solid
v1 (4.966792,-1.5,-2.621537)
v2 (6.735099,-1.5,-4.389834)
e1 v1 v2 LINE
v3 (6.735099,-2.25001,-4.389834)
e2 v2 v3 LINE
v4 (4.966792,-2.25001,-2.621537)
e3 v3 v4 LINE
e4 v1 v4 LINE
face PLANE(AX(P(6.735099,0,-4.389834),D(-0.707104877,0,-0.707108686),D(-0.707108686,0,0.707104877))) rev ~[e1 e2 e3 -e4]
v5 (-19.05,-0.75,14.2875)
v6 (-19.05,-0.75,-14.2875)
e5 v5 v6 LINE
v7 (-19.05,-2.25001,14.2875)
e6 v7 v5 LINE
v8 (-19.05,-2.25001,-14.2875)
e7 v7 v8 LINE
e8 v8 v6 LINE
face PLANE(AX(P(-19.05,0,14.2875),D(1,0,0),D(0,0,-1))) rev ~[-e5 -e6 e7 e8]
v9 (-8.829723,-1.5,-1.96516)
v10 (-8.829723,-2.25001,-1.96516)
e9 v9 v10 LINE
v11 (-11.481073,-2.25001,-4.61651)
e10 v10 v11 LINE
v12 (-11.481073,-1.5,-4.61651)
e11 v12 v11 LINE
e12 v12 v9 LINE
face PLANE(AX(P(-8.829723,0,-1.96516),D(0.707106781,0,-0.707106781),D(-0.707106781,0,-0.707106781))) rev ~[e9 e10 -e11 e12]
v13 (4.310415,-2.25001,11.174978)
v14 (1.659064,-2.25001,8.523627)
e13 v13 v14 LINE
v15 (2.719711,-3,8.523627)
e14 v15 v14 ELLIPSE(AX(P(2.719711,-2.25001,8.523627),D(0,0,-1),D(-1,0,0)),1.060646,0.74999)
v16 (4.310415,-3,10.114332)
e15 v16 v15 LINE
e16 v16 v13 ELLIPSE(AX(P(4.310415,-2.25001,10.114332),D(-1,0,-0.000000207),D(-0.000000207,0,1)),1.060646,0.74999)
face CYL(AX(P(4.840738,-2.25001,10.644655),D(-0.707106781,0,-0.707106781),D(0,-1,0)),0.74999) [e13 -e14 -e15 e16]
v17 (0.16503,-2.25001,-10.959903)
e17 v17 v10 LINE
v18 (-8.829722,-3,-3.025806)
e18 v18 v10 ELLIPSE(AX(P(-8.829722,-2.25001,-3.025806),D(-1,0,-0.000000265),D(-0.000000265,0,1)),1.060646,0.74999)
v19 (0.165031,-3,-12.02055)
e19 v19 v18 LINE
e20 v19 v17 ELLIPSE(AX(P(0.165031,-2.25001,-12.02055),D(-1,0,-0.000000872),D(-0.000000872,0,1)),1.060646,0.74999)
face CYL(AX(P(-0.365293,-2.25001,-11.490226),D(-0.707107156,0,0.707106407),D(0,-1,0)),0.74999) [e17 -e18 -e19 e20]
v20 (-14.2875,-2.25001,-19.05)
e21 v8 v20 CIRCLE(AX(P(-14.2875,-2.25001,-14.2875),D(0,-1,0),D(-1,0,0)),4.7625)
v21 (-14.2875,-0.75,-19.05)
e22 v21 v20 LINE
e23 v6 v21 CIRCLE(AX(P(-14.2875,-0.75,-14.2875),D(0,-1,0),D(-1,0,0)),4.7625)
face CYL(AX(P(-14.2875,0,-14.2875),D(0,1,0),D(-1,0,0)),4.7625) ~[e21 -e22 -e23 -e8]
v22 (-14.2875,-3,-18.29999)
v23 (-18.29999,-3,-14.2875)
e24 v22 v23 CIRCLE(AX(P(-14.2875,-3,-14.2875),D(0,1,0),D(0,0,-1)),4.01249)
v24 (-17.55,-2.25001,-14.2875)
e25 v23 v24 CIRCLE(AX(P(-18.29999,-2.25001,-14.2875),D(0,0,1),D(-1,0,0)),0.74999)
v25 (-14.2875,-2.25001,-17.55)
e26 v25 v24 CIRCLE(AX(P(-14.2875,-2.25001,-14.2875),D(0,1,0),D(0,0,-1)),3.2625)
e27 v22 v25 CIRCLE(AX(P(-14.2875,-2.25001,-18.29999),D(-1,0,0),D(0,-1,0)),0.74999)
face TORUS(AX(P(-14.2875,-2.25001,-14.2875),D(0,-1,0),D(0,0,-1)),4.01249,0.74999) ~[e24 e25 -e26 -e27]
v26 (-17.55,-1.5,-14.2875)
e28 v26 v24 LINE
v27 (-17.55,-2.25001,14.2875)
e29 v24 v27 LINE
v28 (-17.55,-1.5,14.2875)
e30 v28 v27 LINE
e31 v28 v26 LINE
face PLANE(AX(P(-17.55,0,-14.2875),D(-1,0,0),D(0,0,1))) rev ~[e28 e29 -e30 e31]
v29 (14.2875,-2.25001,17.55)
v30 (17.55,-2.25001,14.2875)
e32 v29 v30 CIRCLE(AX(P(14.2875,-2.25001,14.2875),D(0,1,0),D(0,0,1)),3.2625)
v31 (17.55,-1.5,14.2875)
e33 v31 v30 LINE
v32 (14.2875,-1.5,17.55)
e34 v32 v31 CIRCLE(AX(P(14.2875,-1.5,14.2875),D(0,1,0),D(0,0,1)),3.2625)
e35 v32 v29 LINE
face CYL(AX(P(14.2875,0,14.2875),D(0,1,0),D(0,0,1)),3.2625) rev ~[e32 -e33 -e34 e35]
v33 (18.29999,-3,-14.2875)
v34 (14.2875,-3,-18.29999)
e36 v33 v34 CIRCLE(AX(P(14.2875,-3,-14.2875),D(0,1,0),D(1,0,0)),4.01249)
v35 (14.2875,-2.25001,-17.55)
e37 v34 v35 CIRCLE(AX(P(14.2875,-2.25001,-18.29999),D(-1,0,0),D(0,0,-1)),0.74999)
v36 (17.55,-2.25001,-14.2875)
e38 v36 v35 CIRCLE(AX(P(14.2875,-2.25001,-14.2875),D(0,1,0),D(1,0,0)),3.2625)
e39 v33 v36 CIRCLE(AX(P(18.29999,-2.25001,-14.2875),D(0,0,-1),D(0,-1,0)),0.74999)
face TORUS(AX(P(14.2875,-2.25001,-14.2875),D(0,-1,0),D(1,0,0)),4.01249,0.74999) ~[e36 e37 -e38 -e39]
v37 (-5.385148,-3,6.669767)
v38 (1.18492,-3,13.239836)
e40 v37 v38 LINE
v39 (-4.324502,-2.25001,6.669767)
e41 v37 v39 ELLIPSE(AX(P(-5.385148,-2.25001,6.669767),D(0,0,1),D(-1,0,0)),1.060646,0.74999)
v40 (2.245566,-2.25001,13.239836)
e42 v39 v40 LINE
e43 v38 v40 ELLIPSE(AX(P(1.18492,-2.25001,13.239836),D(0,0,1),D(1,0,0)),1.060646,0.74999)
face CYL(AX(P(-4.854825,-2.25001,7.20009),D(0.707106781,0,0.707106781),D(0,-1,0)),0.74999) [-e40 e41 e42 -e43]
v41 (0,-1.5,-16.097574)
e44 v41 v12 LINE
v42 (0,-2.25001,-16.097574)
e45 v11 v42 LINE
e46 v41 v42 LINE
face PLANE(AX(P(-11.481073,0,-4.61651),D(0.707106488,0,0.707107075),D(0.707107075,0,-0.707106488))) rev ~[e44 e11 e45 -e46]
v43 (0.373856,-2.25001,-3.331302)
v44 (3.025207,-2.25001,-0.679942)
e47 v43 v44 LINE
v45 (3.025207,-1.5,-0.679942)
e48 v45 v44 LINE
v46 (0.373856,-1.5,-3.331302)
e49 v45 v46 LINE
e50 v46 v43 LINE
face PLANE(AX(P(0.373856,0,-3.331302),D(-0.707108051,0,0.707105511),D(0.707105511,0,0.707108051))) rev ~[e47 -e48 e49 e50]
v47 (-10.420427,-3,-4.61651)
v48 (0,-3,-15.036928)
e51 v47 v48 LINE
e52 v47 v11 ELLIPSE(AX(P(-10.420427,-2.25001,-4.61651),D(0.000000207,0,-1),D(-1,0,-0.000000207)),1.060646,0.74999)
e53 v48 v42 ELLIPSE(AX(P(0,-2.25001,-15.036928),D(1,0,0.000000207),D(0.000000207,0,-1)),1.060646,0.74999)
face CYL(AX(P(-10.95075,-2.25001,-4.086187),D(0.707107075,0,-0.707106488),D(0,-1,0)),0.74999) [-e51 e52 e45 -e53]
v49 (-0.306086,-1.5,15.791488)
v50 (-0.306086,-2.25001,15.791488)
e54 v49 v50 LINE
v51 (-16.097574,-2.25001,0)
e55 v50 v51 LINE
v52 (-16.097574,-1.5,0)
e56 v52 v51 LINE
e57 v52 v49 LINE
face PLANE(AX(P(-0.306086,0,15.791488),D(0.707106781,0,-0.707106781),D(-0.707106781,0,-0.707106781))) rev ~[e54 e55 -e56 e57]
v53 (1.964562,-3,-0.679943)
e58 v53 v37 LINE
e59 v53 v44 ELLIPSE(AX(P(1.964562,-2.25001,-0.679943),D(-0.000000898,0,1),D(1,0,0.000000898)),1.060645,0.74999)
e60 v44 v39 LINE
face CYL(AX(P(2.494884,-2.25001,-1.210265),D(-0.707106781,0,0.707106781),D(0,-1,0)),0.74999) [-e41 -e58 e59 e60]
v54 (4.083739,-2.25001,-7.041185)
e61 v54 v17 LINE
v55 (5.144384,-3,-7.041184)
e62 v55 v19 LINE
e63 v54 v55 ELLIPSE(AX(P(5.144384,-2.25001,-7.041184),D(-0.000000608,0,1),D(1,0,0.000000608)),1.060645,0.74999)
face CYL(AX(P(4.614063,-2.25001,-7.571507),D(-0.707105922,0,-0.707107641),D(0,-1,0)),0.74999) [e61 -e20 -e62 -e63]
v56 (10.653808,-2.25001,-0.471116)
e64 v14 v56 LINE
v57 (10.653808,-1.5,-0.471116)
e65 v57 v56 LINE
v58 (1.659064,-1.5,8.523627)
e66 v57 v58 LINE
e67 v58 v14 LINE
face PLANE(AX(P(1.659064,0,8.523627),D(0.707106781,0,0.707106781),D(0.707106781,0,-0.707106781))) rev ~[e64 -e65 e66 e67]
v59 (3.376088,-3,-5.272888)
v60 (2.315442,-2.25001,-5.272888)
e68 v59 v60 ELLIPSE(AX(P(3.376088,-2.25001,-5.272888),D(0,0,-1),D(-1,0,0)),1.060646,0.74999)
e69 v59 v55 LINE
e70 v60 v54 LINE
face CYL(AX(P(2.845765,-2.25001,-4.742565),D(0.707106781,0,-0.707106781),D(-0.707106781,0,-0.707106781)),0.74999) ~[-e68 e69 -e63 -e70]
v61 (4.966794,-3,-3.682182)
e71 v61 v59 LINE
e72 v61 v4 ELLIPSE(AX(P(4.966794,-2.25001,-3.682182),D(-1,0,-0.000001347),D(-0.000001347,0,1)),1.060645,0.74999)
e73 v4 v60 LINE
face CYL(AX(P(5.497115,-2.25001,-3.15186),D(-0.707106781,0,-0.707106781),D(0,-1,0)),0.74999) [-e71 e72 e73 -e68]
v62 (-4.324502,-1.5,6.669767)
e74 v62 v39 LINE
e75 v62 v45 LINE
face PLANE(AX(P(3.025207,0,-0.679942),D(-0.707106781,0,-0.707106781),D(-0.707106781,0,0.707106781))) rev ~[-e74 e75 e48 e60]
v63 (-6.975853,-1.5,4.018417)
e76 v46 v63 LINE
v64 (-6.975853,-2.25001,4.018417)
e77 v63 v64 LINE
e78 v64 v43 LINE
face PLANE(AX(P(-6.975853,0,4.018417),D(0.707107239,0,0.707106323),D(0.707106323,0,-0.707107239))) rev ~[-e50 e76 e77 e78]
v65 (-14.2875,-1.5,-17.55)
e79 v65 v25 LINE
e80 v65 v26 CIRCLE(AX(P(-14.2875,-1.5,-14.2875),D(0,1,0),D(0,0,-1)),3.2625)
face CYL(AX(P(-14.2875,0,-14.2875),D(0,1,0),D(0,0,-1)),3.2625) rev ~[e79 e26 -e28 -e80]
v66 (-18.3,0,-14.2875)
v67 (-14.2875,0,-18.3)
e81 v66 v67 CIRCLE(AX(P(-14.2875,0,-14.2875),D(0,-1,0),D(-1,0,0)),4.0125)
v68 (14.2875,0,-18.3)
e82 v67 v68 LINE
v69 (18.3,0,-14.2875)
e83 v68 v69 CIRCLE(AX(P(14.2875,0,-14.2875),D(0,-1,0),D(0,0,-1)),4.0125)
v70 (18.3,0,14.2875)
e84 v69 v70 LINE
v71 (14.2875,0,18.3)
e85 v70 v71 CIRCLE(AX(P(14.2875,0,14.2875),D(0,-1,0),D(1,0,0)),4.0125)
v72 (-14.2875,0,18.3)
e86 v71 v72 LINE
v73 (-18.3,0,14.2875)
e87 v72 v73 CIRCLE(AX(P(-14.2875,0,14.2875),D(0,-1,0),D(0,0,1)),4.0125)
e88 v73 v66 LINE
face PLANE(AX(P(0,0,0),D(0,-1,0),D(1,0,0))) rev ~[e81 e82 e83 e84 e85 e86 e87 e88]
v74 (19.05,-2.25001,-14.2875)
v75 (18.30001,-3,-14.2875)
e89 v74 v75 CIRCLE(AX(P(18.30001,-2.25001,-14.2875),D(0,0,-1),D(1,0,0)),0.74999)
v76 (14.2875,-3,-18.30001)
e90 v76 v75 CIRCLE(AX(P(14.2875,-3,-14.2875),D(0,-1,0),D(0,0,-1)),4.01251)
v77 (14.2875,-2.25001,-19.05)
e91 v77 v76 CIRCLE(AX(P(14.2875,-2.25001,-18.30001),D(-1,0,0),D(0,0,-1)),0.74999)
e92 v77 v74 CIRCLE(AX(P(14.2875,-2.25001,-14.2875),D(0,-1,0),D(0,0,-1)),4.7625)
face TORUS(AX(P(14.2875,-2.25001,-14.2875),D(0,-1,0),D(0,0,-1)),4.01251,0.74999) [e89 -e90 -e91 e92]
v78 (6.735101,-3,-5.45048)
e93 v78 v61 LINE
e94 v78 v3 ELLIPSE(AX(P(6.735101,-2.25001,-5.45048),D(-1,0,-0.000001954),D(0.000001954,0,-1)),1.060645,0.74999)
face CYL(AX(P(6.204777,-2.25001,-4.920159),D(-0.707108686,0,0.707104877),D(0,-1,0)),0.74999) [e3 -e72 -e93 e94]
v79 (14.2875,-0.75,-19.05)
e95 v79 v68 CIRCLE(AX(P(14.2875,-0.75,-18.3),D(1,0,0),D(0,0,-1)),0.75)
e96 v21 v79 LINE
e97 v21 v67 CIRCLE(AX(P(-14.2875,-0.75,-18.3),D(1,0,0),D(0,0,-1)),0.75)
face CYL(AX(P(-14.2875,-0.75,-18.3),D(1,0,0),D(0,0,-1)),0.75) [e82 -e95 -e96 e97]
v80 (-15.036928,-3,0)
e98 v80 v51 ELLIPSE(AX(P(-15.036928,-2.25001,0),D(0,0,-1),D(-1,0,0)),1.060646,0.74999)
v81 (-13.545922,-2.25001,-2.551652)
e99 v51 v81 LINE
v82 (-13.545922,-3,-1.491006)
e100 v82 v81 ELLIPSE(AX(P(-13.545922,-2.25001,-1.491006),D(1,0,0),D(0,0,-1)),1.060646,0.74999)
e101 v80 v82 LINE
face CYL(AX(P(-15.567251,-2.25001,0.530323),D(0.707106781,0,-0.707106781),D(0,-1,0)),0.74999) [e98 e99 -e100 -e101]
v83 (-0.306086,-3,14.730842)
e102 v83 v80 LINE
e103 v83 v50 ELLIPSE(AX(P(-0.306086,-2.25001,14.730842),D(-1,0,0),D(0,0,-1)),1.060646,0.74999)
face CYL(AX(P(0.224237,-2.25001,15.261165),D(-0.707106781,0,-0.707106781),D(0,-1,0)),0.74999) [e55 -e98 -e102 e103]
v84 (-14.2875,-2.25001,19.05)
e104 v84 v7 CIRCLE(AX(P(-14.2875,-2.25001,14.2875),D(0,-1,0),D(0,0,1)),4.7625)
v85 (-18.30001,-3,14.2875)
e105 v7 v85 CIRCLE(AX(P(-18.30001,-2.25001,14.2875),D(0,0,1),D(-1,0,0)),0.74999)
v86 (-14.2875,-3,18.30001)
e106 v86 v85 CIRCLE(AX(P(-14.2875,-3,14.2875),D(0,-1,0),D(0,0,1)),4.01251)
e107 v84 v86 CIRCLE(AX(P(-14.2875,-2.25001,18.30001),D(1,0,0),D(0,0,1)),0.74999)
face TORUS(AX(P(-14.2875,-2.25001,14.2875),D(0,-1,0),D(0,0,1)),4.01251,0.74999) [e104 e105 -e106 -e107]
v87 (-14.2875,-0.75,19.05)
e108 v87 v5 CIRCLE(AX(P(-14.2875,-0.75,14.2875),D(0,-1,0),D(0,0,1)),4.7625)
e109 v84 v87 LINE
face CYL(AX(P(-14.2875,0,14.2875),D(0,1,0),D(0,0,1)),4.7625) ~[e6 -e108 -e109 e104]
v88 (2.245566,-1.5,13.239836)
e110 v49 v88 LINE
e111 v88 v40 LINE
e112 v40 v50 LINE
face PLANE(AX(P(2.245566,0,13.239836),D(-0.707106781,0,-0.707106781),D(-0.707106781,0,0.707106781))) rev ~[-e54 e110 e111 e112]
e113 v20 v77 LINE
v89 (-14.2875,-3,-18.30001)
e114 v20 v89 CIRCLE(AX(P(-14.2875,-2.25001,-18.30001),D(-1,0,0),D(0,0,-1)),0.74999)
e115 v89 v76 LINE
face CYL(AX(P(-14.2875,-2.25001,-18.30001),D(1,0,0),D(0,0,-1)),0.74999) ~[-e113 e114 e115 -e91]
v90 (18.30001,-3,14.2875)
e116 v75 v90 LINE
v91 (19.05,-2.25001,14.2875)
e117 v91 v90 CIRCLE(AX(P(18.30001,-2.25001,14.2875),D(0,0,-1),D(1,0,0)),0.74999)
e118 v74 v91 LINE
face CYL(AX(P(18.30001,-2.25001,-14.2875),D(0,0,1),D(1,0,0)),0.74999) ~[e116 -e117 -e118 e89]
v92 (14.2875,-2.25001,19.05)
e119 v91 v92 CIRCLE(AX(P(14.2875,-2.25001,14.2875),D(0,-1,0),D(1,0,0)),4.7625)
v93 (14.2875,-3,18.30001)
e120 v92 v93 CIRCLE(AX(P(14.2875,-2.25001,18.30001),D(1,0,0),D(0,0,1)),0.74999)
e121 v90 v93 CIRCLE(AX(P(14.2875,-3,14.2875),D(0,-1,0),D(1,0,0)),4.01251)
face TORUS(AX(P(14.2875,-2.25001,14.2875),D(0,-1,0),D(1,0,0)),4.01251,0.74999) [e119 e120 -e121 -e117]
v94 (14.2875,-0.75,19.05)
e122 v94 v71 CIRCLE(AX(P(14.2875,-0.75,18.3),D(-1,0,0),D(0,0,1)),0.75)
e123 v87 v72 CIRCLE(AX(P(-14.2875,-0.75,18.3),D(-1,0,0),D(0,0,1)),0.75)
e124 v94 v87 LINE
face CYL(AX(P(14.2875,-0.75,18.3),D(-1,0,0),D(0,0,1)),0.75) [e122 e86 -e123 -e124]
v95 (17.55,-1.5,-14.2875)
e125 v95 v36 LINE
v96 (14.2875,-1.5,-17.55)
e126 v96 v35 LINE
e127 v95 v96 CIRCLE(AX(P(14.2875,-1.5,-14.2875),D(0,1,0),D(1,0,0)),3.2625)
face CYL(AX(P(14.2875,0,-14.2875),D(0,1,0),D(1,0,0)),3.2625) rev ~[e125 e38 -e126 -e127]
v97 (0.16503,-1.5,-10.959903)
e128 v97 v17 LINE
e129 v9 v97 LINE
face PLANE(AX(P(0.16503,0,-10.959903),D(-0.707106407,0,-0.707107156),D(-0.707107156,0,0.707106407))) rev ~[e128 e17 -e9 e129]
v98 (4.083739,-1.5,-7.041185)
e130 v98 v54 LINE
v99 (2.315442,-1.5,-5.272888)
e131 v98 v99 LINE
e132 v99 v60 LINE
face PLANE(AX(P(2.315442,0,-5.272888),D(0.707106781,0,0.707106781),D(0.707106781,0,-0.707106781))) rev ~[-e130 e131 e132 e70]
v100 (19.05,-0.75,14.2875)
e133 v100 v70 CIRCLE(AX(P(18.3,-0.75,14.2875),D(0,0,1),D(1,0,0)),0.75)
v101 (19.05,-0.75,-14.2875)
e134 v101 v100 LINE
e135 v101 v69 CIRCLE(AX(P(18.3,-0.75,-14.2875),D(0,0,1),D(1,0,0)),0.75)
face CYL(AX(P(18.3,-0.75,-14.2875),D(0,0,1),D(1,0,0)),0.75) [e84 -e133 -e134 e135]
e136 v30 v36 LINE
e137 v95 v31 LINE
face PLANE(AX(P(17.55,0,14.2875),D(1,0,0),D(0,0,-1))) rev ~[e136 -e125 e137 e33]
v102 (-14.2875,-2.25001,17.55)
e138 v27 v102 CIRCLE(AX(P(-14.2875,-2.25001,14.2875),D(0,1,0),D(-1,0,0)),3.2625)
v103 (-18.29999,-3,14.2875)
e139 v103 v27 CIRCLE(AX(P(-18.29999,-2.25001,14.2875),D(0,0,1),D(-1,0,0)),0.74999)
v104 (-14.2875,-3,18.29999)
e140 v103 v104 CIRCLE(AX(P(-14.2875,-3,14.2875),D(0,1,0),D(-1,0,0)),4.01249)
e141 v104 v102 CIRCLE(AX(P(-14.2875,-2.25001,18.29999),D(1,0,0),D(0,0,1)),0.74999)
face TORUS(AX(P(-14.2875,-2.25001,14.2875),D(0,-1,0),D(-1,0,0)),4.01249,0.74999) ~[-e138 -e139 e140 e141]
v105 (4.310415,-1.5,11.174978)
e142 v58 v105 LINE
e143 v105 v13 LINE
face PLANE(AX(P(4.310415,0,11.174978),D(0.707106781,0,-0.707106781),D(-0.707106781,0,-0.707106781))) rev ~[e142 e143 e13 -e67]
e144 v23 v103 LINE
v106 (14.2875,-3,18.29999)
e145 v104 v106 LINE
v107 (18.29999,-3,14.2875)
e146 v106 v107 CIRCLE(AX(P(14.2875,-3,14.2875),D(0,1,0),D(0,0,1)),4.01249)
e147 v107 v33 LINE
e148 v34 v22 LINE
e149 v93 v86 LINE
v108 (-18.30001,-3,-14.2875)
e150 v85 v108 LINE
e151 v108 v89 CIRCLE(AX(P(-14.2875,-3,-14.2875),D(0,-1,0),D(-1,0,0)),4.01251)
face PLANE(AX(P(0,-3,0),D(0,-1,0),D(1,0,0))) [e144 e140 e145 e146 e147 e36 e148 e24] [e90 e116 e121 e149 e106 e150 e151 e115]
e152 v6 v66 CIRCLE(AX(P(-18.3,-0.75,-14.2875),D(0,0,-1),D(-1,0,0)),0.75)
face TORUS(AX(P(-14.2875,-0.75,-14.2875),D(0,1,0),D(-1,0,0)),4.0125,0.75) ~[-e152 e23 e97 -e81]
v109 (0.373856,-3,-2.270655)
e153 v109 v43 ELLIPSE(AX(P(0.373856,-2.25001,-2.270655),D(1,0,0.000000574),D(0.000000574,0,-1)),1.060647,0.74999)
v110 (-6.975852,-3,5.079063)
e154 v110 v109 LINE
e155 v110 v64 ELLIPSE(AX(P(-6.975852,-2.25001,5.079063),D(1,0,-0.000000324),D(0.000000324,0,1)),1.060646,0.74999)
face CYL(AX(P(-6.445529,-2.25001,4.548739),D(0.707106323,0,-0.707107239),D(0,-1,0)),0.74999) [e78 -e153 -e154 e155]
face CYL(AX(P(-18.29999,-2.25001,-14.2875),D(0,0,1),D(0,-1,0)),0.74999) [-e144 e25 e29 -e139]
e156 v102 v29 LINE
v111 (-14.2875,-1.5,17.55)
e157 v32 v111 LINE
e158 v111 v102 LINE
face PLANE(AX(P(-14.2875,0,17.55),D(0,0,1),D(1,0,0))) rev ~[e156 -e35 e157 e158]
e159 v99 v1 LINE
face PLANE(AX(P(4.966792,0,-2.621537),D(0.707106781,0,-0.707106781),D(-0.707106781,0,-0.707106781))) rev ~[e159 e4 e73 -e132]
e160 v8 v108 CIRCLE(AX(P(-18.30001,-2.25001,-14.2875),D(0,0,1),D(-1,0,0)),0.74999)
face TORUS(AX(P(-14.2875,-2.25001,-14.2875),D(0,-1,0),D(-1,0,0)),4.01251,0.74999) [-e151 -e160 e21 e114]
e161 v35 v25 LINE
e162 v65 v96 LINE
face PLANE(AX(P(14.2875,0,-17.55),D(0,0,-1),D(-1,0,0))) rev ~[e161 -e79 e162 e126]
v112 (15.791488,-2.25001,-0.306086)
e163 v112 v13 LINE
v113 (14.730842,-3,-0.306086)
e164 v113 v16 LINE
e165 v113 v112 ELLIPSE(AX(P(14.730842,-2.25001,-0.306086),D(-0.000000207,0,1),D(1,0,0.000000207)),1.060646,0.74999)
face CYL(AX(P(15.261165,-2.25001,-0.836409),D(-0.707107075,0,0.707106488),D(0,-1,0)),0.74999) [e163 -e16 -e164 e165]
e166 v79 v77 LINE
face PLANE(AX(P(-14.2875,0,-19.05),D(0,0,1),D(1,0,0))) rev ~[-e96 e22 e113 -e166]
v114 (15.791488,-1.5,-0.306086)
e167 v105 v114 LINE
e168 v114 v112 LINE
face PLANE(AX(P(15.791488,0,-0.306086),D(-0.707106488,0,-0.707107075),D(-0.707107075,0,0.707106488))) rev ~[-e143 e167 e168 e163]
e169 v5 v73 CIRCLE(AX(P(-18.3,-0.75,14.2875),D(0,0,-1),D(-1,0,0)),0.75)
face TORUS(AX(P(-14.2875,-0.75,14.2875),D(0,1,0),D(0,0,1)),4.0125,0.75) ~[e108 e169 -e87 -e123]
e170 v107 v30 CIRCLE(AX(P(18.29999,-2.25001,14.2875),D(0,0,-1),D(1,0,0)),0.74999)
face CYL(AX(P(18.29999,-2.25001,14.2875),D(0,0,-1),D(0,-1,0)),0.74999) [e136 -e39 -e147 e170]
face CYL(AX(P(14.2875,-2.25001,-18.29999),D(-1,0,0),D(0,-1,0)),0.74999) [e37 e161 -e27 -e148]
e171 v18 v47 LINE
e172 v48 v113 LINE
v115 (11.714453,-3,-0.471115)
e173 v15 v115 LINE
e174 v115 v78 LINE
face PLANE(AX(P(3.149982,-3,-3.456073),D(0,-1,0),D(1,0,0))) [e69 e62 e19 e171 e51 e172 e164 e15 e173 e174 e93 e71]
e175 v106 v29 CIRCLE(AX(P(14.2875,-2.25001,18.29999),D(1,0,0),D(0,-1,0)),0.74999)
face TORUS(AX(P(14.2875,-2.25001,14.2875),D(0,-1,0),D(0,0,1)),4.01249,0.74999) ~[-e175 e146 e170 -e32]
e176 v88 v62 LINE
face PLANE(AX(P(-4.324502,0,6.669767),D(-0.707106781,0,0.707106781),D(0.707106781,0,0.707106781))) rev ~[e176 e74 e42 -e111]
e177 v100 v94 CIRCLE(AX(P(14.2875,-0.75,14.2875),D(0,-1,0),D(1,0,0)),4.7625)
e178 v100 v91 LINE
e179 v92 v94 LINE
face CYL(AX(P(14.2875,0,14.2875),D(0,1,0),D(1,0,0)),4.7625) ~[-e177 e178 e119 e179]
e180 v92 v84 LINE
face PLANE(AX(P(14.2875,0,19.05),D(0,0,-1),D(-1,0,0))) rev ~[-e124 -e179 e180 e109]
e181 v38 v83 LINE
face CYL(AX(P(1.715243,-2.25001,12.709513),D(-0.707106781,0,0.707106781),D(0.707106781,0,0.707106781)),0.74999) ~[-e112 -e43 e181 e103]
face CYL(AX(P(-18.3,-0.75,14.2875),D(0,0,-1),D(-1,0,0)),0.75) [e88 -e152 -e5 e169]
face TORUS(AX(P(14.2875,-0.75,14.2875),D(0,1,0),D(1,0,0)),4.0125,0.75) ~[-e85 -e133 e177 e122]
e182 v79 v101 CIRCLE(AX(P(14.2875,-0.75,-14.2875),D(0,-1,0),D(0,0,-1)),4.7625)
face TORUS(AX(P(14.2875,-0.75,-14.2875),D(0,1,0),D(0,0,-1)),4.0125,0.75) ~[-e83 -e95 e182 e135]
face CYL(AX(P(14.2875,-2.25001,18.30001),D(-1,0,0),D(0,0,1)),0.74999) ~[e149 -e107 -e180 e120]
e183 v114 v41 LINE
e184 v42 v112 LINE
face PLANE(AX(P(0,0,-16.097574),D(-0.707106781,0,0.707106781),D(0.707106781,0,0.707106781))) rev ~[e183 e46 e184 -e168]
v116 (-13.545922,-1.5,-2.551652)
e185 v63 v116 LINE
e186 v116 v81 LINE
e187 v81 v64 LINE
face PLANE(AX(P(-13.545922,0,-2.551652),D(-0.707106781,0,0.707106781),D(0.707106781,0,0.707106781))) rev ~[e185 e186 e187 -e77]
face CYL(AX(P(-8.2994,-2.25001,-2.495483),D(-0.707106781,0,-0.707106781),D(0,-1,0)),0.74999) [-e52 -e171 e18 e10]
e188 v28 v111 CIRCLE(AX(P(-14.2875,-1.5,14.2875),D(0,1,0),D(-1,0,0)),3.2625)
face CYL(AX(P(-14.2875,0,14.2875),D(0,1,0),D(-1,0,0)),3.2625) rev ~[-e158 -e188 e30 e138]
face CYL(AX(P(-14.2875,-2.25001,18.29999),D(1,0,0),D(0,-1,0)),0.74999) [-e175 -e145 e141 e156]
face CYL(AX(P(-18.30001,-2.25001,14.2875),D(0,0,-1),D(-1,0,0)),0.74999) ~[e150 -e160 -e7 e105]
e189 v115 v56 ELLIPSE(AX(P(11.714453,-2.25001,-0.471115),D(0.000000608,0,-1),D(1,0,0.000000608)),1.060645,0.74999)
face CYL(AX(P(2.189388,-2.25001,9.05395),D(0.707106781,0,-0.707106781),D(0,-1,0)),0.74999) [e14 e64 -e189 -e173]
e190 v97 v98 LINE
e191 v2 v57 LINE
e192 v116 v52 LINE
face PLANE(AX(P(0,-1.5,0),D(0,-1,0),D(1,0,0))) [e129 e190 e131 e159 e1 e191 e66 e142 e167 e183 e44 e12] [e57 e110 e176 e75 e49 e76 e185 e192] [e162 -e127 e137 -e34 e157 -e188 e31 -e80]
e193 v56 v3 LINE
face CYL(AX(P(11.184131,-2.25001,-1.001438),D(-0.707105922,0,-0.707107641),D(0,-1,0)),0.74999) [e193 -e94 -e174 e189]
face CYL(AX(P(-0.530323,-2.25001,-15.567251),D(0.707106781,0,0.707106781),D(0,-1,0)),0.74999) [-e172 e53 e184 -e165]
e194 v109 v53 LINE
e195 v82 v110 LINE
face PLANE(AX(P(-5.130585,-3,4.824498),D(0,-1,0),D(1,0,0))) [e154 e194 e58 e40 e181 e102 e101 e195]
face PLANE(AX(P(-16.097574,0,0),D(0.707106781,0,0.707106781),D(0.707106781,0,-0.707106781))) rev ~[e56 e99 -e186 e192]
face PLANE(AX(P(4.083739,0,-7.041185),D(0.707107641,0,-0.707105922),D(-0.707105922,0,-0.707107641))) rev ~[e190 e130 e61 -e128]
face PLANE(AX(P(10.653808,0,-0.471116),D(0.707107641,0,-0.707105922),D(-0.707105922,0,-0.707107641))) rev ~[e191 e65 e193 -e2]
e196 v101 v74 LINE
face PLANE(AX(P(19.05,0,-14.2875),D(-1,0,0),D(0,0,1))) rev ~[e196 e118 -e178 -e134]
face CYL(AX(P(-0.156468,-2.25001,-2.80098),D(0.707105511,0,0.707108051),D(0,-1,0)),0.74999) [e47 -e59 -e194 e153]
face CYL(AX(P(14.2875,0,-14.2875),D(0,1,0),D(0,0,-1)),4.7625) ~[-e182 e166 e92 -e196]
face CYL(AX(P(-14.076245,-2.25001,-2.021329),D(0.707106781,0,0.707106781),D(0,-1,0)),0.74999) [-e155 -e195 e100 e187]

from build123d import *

# Parameters (mm, degrees)
F1_DEPTH = 1.5
F2_DEPTH = 3
F4_DEPTH = 3
F5_R     = 0.74999
F6_R     = 0.75


# Not quite as in the source:
# - a fillet or chamfer is up to 0.001 mm smaller than in the source, because OpenCascade refuses the exact size


with BuildPart() as f1:
    # F0 (on Front) → F1 (new body)
    with BuildSketch(Plane.XZ):
        with BuildLine():
            ThreePointArc((-19.05, -14.2875), (-17.6550960454, -17.6550960454), (-14.2875, -19.05))
            Line((-14.2875, -19.05), (14.2875, -19.05))
            ThreePointArc((14.2875, -19.05), (17.6550960454, -17.6550960454), (19.05, -14.2875))
            Line((19.05, -14.2875), (19.05, 14.2875))
            ThreePointArc((19.05, 14.2875), (17.6550960454, 17.6550960454), (14.2875, 19.05))
            Line((14.2875, 19.05), (-14.2875, 19.05))
            ThreePointArc((-14.2875, 19.05), (-17.6550960454, 17.6550960454), (-19.05, 14.2875))
            Line((-19.05, 14.2875), (-19.05, -14.2875))
        make_face()
        Polygon((15.791487975, -0.306085875), (0, -16.09757385), (-11.48107305, -4.616510325), (-8.829722625, -1.9651599), (0.16503015, -10.95990315), (4.083738975, -7.0411848), (2.315441775, -5.2728876), (4.9667922, -2.621537175), (6.735098925, -4.389834375), (10.65380775, -0.471116025), (1.6590645, 8.523627225), (4.310414925, 11.17497765), align=None, mode=Mode.SUBTRACT)
        Polygon((-6.975852825, 4.018416525), (-13.5459216, -2.55165225), (-16.09757385, 0), (-0.306085875, 15.791487975), (2.245566375, 13.239835725), (-4.3245024, 6.66976695), (3.025206675, -0.679942125), (0.37385625, -3.331302075), align=None, mode=Mode.SUBTRACT)
    extrude(amount=F1_DEPTH)

    # F0 (on Front) → F2 (join)
    with BuildSketch(Plane.XZ):
        Polygon((-16.09757385, 0), (-13.5459216, -2.55165225), (-6.975852825, 4.018416525), (0.37385625, -3.331302075), (3.025206675, -0.679942125), (-4.3245024, 6.66976695), (2.245566375, 13.239835725), (-0.306085875, 15.791487975), align=None)
        Polygon((-11.48107305, -4.616510325), (0, -16.09757385), (15.791487975, -0.306085875), (4.310414925, 11.17497765), (1.6590645, 8.523627225), (10.65380775, -0.471116025), (6.735098925, -4.389834375), (4.9667922, -2.621537175), (2.315441775, -5.2728876), (4.083738975, -7.0411848), (0.16503015, -10.95990315), (-8.829722625, -1.9651599), align=None)
    extrude(amount=F2_DEPTH)

    # F3 (on face) → F4 (join)
    with BuildSketch(Plane.XZ):
        with BuildLine():
            ThreePointArc((-14.2875, 19.05), (-17.6550960454, 17.6550960454), (-19.05, 14.2875))
            Line((-19.05, 14.2875), (-19.05, -14.2875))
            ThreePointArc((-19.05, -14.2875), (-17.6550960454, -17.6550960454), (-14.2875, -19.05))
            Line((-14.2875, -19.05), (14.2875, -19.05))
            ThreePointArc((14.2875, -19.05), (17.6550960454, -17.6550960454), (19.05, -14.2875))
            Line((19.05, -14.2875), (19.05, 14.2875))
            ThreePointArc((19.05, 14.2875), (17.6550960454, 17.6550960454), (14.2875, 19.05))
            Line((14.2875, 19.05), (-14.2875, 19.05))
        make_face()
        with BuildLine():
            ThreePointArc((-17.55, 14.2875), (-16.5944358736, 16.5944358736), (-14.2875, 17.55))
            Line((-14.2875, 17.55), (14.2875, 17.55))
            ThreePointArc((14.2875, 17.55), (16.5944358736, 16.5944358736), (17.55, 14.2875))
            Line((17.55, 14.2875), (17.55, -14.2875))
            ThreePointArc((17.55, -14.2875), (16.5944358736, -16.5944358736), (14.2875, -17.55))
            Line((14.2875, -17.55), (-14.2875, -17.55))
            ThreePointArc((-14.2875, -17.55), (-16.5944358736, -16.5944358736), (-17.55, -14.2875))
            Line((-17.55, -14.2875), (-17.55, 14.2875))
        make_face(mode=Mode.SUBTRACT)
    extrude(amount=F4_DEPTH)

    # F5 (radius 0.75 in the source; OpenCascade refuses exactly that, so slightly less here)
    f5_edges = [f1.edges().sort_by_distance(p)[0] for p in [
        (-4.332346, -3, -6.462532),
        (-10.155398, -3, -3.290835),
        (-5.740537, -3, -10.357042),
        (7.895744, -3, -8.20183),
        (10.050951, -3, 5.434446),
        (2.98474, -3, 9.849302),
        (6.156436, -3, 4.026256),
        (8.694453, -3, -2.430475),
        (5.850946, -3, -3.505686),
        (3.641117, -3, -3.947212),
        (3.19959, -3, -6.157036),
        (2.124385, -3, -9.000544),
        (-8.20183, -3, 7.895744),
        (-14.821748, -3, -1.275826),
        (-10.260887, -3, 0.733382),
        (-3.300998, -3, 0.343557),
        (1.699531, -3, -2.005622),
        (-0.649648, -3, 2.994912),
        (-1.039468, -3, 9.954801),
        (0.96974, -3, 14.515662),
        (-17.655096, -3, 17.655096),
        (-19.05, -3, 0),
        (-17.655096, -3, -17.655096),
        (0, -3, -19.05),
        (17.655096, -3, -17.655096),
        (19.05, -3, 0),
        (17.655096, -3, 17.655096),
        (0, -3, 19.05),
        (-16.594436, -3, 16.594436),
        (0, -3, 17.55),
        (16.594436, -3, 16.594436),
        (17.55, -3, 0),
        (16.594436, -3, -16.594436),
        (0, -3, -17.55),
        (-16.594436, -3, -16.594436),
        (-17.55, -3, 0),
    ]]
    fillet(f5_edges, radius=F5_R)

    # F6
    f6_edges = [f1.edges().sort_by_distance(p)[0] for p in [
        (-17.655096, 0, -17.655096),
        (0, 0, -19.05),
        (17.655096, 0, -17.655096),
        (19.05, 0, 0),
        (17.655096, 0, 17.655096),
        (0, 0, 19.05),
        (-17.655096, 0, 17.655096),
        (-19.05, 0, 0),
    ]]
    fillet(f6_edges, radius=F6_R)


solid = f1.part
